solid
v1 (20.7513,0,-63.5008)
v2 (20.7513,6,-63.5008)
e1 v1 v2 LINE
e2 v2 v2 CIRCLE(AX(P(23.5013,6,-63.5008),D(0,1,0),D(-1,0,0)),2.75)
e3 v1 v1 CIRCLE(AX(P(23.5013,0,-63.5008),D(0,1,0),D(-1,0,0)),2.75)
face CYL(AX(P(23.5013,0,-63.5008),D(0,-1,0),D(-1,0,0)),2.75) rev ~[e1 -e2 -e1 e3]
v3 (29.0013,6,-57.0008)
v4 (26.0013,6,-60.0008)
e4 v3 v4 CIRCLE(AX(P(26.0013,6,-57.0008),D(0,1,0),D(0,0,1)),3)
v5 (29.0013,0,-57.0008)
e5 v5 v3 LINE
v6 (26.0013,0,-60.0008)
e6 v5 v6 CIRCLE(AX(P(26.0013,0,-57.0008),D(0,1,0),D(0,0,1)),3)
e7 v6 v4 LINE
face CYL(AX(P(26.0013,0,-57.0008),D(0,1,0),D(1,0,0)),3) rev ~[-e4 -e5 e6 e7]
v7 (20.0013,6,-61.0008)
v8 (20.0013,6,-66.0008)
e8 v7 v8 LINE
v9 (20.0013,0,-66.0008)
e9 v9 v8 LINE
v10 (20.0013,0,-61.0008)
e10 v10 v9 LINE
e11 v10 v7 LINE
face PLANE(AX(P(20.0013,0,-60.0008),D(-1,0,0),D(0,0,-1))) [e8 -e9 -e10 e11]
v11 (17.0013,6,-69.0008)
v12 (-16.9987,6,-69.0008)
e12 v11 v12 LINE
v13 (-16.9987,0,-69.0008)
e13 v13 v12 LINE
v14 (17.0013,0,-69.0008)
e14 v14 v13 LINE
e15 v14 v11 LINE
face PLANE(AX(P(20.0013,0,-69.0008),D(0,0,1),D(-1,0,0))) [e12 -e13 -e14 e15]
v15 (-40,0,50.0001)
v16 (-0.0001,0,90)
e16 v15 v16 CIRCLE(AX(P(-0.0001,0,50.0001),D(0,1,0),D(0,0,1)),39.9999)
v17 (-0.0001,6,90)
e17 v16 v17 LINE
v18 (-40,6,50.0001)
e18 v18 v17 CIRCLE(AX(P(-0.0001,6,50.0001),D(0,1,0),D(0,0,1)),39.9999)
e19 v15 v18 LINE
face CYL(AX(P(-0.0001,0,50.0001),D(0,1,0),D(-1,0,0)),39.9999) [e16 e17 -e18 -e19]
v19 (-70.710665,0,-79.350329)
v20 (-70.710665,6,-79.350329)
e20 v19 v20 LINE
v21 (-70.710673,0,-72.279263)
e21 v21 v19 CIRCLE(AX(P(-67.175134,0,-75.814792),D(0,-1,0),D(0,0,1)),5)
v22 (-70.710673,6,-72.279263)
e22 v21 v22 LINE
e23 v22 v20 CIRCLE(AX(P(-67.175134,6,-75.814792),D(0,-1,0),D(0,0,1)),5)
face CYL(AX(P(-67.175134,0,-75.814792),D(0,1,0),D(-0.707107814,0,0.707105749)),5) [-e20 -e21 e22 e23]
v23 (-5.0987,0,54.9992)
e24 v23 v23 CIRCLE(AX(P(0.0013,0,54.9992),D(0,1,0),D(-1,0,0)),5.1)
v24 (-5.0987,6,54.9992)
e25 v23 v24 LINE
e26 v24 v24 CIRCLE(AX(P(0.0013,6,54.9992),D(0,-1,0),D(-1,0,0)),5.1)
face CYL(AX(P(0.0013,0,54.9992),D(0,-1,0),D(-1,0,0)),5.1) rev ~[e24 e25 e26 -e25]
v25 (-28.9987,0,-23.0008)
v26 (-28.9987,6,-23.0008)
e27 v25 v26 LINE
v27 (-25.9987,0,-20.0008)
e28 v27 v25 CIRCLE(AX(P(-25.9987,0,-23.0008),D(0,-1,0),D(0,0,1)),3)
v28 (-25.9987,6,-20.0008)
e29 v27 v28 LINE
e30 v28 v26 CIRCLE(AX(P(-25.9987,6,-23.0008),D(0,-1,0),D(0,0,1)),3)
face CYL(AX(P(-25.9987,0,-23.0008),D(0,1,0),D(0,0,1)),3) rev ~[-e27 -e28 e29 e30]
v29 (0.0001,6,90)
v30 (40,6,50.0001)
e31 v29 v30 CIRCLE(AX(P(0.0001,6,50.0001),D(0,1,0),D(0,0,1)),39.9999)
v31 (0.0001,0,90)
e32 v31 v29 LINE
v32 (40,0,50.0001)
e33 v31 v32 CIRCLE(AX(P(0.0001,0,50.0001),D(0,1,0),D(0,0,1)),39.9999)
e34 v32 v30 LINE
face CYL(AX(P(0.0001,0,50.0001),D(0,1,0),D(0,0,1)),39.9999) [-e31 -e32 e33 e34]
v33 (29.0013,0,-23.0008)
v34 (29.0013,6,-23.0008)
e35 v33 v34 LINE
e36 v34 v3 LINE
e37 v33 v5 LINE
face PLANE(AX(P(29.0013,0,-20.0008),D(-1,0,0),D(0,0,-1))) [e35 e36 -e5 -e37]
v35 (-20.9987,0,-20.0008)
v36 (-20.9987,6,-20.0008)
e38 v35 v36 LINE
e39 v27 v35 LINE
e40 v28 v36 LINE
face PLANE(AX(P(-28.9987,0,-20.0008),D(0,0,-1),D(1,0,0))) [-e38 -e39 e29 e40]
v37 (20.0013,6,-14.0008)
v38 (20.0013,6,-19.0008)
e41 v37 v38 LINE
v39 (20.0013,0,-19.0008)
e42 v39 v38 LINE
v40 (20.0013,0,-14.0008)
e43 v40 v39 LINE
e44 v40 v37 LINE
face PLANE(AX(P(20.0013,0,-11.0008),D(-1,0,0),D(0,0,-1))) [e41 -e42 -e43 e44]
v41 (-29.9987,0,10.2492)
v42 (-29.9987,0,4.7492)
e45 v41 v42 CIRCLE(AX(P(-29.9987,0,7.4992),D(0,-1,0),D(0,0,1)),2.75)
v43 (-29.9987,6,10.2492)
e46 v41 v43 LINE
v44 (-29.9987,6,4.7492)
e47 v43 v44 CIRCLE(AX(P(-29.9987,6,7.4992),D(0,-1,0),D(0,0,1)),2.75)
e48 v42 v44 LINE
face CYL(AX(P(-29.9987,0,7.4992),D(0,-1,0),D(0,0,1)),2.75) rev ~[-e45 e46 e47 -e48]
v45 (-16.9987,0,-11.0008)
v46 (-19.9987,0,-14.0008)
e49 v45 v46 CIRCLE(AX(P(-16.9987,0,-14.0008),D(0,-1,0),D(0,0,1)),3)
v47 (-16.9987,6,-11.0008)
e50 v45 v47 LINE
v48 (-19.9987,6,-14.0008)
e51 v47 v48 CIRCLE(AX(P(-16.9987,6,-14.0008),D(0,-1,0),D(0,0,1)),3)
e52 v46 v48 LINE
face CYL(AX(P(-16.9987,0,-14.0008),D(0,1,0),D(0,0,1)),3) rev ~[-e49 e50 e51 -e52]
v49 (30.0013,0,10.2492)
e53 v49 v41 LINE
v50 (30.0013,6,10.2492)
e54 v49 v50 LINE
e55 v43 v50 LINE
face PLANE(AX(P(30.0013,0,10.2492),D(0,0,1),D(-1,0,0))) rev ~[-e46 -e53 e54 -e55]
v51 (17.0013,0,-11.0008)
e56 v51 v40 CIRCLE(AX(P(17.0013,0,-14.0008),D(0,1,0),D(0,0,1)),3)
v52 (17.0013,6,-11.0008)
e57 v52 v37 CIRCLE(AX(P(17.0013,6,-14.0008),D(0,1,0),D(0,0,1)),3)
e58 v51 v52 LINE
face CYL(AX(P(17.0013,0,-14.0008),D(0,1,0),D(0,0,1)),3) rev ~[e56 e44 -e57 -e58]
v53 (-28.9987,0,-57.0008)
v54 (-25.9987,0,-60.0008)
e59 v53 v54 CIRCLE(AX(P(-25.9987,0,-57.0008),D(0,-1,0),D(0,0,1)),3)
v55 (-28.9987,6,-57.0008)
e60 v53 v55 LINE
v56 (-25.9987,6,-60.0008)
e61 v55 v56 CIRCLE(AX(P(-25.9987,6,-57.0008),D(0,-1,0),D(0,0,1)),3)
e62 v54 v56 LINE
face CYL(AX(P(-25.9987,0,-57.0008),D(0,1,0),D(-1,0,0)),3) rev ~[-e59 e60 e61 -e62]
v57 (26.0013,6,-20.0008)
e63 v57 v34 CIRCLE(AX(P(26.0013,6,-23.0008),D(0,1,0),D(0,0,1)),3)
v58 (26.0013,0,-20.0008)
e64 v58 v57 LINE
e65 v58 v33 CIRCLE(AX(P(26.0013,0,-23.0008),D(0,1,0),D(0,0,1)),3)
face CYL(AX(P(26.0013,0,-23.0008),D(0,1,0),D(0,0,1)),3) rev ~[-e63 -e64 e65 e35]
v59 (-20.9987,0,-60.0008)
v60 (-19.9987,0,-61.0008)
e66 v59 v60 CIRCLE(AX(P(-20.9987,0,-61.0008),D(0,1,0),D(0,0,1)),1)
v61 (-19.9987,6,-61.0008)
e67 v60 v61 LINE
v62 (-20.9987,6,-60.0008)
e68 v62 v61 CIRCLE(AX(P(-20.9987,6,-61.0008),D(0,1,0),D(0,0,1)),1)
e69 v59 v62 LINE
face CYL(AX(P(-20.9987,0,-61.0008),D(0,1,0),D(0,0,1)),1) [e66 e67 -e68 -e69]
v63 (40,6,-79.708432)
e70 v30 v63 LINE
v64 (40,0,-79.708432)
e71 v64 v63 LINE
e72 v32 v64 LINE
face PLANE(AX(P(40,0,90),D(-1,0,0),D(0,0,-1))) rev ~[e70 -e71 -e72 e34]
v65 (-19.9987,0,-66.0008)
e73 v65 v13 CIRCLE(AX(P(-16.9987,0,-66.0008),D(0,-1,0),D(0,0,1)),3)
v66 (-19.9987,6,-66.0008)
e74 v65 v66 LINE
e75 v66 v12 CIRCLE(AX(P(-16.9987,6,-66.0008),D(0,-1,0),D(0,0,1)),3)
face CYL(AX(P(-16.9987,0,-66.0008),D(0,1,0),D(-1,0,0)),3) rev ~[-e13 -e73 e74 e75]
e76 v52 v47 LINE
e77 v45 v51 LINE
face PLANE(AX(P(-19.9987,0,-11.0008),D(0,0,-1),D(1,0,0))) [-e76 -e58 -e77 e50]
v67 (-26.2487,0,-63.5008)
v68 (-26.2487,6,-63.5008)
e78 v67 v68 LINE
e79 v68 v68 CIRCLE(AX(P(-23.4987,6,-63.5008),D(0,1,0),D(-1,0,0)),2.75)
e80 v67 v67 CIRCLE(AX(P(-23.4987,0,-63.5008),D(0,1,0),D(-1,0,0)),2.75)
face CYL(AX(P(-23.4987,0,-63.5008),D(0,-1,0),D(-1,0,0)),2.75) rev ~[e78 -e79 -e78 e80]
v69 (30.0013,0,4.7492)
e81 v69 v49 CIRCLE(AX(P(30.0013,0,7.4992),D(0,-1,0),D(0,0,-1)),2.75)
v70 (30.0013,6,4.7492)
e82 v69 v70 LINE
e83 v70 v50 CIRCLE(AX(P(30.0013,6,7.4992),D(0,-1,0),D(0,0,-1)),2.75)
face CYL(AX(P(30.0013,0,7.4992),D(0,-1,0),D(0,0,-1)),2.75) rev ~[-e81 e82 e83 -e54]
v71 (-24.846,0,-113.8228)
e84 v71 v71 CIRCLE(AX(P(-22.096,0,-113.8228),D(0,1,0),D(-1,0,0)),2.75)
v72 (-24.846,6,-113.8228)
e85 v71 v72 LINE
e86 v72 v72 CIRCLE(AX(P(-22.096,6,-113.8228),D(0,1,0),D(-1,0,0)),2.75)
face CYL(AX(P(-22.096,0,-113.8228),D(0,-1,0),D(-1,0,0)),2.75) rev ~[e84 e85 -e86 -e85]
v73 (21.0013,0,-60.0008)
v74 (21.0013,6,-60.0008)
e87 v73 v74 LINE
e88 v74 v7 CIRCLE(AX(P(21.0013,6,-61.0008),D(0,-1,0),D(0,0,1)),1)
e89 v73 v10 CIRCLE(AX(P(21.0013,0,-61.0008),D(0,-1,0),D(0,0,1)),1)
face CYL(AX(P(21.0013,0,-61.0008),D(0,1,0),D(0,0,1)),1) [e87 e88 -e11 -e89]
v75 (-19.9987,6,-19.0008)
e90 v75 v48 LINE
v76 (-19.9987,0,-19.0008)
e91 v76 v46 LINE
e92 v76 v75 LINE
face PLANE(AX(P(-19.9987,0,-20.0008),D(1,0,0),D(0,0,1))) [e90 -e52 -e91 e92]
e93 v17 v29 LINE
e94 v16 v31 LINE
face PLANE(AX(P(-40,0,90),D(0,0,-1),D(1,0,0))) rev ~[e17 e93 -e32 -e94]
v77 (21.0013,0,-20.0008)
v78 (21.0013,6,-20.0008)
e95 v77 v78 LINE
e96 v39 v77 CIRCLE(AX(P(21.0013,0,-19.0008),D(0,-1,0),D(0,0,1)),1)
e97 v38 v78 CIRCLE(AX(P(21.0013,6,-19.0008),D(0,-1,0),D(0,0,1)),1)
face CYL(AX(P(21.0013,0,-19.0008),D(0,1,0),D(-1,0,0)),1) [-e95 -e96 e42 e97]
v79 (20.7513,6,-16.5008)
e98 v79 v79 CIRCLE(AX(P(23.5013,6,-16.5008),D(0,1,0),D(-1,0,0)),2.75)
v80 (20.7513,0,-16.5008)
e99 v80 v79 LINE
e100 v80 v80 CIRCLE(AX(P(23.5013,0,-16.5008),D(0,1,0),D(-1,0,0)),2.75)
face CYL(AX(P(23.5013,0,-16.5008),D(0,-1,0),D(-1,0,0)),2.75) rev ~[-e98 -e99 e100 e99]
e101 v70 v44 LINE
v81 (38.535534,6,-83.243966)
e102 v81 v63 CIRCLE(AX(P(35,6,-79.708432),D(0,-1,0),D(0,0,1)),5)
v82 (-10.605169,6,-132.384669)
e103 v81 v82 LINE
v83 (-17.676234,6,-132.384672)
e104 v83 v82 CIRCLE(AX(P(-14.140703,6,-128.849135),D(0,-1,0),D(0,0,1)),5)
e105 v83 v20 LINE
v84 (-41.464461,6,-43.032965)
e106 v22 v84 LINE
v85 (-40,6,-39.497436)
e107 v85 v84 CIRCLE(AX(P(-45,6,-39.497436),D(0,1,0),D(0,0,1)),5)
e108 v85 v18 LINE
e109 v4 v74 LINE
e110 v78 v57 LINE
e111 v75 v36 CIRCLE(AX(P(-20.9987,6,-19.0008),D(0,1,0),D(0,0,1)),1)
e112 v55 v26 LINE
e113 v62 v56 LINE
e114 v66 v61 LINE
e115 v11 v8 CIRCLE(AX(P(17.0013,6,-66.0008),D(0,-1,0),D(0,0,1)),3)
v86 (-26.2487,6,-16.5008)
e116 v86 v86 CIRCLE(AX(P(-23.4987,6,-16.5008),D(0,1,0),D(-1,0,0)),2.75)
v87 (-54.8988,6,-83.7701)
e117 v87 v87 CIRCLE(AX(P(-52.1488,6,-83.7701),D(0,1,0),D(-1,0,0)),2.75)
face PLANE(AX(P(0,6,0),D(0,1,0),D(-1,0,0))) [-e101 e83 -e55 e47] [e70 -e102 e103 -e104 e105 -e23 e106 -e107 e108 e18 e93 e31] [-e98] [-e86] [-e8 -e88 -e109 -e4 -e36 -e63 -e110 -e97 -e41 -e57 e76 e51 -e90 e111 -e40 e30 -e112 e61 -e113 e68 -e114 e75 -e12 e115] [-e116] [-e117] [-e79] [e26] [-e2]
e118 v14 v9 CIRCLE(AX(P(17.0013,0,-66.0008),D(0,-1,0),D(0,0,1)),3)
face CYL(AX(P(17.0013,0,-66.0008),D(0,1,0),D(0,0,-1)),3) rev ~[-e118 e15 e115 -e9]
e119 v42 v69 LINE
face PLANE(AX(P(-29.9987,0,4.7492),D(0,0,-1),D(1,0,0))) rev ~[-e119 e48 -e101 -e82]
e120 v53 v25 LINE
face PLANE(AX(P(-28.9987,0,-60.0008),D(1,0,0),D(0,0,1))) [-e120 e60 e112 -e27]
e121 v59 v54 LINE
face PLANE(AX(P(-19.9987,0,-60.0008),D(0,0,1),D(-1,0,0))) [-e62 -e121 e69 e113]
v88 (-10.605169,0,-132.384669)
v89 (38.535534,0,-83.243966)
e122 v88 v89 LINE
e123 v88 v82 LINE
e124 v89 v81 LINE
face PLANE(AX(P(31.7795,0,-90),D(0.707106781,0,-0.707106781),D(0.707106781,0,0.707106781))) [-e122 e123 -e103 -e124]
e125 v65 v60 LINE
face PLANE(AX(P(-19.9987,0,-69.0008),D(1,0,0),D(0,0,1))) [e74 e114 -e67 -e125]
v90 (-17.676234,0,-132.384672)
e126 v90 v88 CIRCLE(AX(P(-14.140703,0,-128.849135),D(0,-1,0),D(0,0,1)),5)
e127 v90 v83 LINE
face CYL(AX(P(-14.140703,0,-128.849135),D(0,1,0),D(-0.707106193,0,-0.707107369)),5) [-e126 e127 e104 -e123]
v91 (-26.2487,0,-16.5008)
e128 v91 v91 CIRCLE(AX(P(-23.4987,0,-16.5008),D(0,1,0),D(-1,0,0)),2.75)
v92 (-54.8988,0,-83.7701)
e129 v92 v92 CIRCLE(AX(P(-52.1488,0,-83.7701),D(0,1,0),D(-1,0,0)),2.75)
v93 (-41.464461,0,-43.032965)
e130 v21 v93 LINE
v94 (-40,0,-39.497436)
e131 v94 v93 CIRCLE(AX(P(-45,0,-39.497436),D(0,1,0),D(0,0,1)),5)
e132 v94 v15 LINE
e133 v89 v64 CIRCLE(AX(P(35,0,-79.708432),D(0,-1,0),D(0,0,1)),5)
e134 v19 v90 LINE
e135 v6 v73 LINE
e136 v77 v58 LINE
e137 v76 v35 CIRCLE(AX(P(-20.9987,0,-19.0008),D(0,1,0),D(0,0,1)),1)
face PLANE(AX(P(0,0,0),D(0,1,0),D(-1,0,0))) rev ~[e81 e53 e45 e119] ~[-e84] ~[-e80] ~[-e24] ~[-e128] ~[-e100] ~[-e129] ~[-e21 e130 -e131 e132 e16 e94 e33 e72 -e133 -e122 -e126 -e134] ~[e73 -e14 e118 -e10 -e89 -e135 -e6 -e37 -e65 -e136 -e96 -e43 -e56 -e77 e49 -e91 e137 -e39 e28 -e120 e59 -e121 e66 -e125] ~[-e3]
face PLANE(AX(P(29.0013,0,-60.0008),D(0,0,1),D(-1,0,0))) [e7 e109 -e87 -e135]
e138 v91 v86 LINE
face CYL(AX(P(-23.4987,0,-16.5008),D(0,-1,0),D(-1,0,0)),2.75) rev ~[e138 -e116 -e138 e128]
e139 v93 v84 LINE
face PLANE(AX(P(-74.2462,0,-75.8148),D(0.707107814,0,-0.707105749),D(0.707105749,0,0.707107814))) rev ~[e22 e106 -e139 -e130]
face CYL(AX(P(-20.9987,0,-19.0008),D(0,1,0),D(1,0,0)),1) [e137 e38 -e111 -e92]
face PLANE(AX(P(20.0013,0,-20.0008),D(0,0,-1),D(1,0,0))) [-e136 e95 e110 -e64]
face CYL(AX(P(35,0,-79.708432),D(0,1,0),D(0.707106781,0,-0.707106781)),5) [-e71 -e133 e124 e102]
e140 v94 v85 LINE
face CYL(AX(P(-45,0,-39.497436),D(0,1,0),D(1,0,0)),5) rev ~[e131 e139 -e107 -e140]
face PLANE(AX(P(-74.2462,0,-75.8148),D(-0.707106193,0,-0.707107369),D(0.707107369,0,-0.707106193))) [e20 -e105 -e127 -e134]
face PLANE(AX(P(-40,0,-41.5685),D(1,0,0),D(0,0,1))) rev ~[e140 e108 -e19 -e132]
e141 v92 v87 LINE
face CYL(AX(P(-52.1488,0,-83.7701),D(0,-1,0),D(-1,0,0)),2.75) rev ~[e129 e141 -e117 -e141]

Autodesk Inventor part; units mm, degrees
ref_plane "YZ Plane" through (0, 0, 0) normal (1, 0, 0) x (0, 1, 0)
ref_plane "XZ Plane" through (0, 0, 0) normal (0, 1, 0) x (-1, 0, 0)
sketch "Sketch1" plane through (0, 0, 0) normal (0, 1, 0) x (-1, 0, 0)
  line L0 (40, 90) -> (-40, 90)
  line L1 (-40, 90) -> (-40, -81.7795)
  line L2 (40, -41.5685) -> (40, 90)
  line L3 (40, 90) -> (-40, -90) construction
  line L4 (-40, 90) -> (40, -90) construction
  circle A0 centre (-0.0013, 54.9992) radius 5.1
  line L5 (23.4987, -16.5008) -> (-23.5013, -16.5008) construction
  line L6 (-23.5013, -16.5008) -> (-23.5013, -63.5008) construction
  line L7 (-23.5013, -63.5008) -> (23.4987, -63.5008) construction
  line L8 (23.4987, -63.5008) -> (23.4987, -16.5008) construction
  line L9 (23.4987, -16.5008) -> (-23.5013, -63.5008) construction
  line L10 (-23.5013, -16.5008) -> (23.4987, -63.5008) construction
  circle A1 centre (23.4987, -16.5008) radius 2.75
  circle A2 centre (23.4987, -63.5008) radius 2.75
  circle A3 centre (-23.5013, -16.5008) radius 2.75
  circle A4 centre (-23.5013, -63.5008) radius 2.75
  line L11 (-0.0013, -90.0008) -> (-0.0013, -80) construction
  line L12 (19.9987, -11.0008) -> (-20.0013, -11.0008)
  line L13 (-20.0013, -11.0008) -> (-20.0013, -69.0008)
  line L14 (-20.0013, -69.0008) -> (19.9987, -69.0008)
  line L15 (19.9987, -69.0008) -> (19.9987, -11.0008)
  line L16 (19.9987, -11.0008) -> (-20.0013, -69.0008) construction
  line L17 (-20.0013, -11.0008) -> (19.9987, -69.0008) construction
  line L18 (-29.0013, -60.0008) -> (28.9987, -60.0008)
  line L19 (28.9987, -60.0008) -> (28.9987, -20.0008)
  line L20 (28.9987, -20.0008) -> (-29.0013, -20.0008)
  line L21 (-29.0013, -20.0008) -> (-29.0013, -60.0008)
  line L22 (-29.0013, -60.0008) -> (28.9987, -20.0008) construction
  line L23 (28.9987, -60.0008) -> (-29.0013, -20.0008) construction
  line L24 (-0.0013, 54.9992) -> (102.5291, -47.5313) construction
  line L25 (-0.0013, 54.9992) -> (144.9987, 54.9992) construction
  line L26 (28.2843, 83.2843) -> (-28.2843, 26.7157) construction
  line L27 (-28.2843, 26.7157) -> (74.2462, -75.8148) construction
  line L28 (74.2462, -75.8148) -> (130.8148, -19.2462) construction
  line L29 (130.8148, -19.2462) -> (28.2843, 83.2843) construction
  line L30 (28.2843, 83.2843) -> (74.2462, -75.8148) construction
  line L31 (-28.2843, 26.7157) -> (130.8148, -19.2462) construction
  line L32 (74.2462, -75.8148) -> (14.1407, -135.9202)
  line L33 (14.1407, -135.9202) -> (-0.0014, -121.7781)
  line L34 (-0.0014, -121.7781) -> (-31.7795, -90)
  line L35 (74.2462, -75.8148) -> (40, -41.5685)
  line L36 (-31.7795, -90) -> (-40, -81.7795)
  line L37 (44.1935, -105.8675) -> (37.1224, -98.7964)
  line L38 (37.1224, -98.7964) -> (52.1488, -83.7701) construction
  line L39 (37.1224, -98.7964) -> (22.096, -113.8228) construction
  circle A5 centre (52.1488, -83.7701) radius 2.75
  circle A6 centre (22.096, -113.8228) radius 2.75
  line L40 (-0.0013, 54.9992) -> (-0.0013, -40.0008)
  point P0 (0, 0)
  point P1 (51.2639, 3.7339)
  point P2 (-0.0013, -40.0008)
  dimension "d0" = 80
  dimension "d1" = 180
  dimension "d3" = 10.2
  dimension "d5" = 47
  dimension "d6" = 47
  dimension "d7" = 5.5
  dimension "d8" = 5.5
  dimension "d9" = 5.5
  dimension "d10" = 5.5
  dimension "d12" = 40
  dimension "d13" = 58
  dimension "d14" = 58
  dimension "d15" = 40
  dimension "d27" = 45
  dimension "d28" = 145
  dimension "d29" = 80
  dimension "d30" = 145
  dimension "d31" = 85.002
  dimension "d32" = 20
  dimension "d33" = 10
  dimension "d35" = 21.2505
  dimension "d36" = 21.2505
  dimension "d37" = 5.5
  dimension "d38" = 5.5
  dimension "d53" = 95
extrude "Plate3" add sketch "Sketch1" along normal blind 6
fillet "Fillet6" radius 5 4 edges at (-40, 3, -41.5685) (-74.2462, 3, -75.8148) (-14.1407, 3, -135.9202) (40, 3, -81.7795)
fillet "Fillet7" radius 40 2 edges at (40, 3, 90) (-40, 3, 90)
sketch "Sketch2" plane through (0, 0, 0) normal (0, -1, 0) x (1, 0, 0)
  circle A0 centre (0.0013, 54.9992) radius 5.1 projected
  line L0 (0.0013, 54.9992) -> (0.0013, -40.0008) construction
  line L1 (0.0013, 7.4992) -> (55.0013, 7.4992) construction
  line L2 (0.0013, 7.4992) -> (-54.9987, 7.4992) construction
  line L3 (-29.9987, 7.4992) -> (30.0013, 7.4992) construction
  line L4 (-29.9987, 4.7492) -> (30.0013, 4.7492)
  line L5 (30.0013, 10.2492) -> (-29.9987, 10.2492)
  arc A1 (-29.9987, 10.2492) -> (-29.9987, 4.7492) centre (-29.9987, 7.4992) ccw
  arc A2 (30.0013, 4.7492) -> (30.0013, 10.2492) centre (30.0013, 7.4992) ccw
  point P0 (0, 0)
  dimension "d43" = 95
  dimension "d44" = 55
  dimension "d45" = 55
  dimension "d46" = 30
  dimension "d47" = 5.5
extrude "Extrusion1" cut sketch "Sketch2" against normal blind 10 contours A1 L5 A2 L4
fillet "Fillet9" radius 3 8 edges at (20.0013, 3, -11.0008) (29.0013, 3, -20.0008) (-28.9987, 3, -20.0008) (-19.9987, 3, -11.0008) (29.0013, 3, -60.0008) (20.0013, 3, -69.0008) (-28.9987, 3, -60.0008) (-19.9987, 3, -69.0008)
fillet "Fillet10" radius 1 4 edges at (-19.9987, 3, -20.0008) (20.0013, 3, -20.0008) (20.0013, 3, -60.0008) (-19.9987, 3, -60.0008)
ref_plane "Work Plane1" through (-29.9987, 0, 7.4992) normal (0, 0, 1) x (1, 0, 0)
equation "\"d39\" = Thickness"
equation "\"BendRadius\" = Thickness"
equation "\"BendReliefWidth\" = Thickness"
equation "\"BendReliefDepth\" = 0.5 * Thickness"
equation "\"CornerReliefSize\" = 4 * Thickness"
equation "\"MinimumRemnant\" = 2 * Thickness"
equation "\"TransitionRadius\" = BendRadius"
equation "\"JacobiRadiusSize\" = BendRadius"
equation "\"GapSize\" = Thickness"
equation "\"Thickness\" = 6"
properties part number "NEMA23MountPlatev2" material "Aluminum 6061"
